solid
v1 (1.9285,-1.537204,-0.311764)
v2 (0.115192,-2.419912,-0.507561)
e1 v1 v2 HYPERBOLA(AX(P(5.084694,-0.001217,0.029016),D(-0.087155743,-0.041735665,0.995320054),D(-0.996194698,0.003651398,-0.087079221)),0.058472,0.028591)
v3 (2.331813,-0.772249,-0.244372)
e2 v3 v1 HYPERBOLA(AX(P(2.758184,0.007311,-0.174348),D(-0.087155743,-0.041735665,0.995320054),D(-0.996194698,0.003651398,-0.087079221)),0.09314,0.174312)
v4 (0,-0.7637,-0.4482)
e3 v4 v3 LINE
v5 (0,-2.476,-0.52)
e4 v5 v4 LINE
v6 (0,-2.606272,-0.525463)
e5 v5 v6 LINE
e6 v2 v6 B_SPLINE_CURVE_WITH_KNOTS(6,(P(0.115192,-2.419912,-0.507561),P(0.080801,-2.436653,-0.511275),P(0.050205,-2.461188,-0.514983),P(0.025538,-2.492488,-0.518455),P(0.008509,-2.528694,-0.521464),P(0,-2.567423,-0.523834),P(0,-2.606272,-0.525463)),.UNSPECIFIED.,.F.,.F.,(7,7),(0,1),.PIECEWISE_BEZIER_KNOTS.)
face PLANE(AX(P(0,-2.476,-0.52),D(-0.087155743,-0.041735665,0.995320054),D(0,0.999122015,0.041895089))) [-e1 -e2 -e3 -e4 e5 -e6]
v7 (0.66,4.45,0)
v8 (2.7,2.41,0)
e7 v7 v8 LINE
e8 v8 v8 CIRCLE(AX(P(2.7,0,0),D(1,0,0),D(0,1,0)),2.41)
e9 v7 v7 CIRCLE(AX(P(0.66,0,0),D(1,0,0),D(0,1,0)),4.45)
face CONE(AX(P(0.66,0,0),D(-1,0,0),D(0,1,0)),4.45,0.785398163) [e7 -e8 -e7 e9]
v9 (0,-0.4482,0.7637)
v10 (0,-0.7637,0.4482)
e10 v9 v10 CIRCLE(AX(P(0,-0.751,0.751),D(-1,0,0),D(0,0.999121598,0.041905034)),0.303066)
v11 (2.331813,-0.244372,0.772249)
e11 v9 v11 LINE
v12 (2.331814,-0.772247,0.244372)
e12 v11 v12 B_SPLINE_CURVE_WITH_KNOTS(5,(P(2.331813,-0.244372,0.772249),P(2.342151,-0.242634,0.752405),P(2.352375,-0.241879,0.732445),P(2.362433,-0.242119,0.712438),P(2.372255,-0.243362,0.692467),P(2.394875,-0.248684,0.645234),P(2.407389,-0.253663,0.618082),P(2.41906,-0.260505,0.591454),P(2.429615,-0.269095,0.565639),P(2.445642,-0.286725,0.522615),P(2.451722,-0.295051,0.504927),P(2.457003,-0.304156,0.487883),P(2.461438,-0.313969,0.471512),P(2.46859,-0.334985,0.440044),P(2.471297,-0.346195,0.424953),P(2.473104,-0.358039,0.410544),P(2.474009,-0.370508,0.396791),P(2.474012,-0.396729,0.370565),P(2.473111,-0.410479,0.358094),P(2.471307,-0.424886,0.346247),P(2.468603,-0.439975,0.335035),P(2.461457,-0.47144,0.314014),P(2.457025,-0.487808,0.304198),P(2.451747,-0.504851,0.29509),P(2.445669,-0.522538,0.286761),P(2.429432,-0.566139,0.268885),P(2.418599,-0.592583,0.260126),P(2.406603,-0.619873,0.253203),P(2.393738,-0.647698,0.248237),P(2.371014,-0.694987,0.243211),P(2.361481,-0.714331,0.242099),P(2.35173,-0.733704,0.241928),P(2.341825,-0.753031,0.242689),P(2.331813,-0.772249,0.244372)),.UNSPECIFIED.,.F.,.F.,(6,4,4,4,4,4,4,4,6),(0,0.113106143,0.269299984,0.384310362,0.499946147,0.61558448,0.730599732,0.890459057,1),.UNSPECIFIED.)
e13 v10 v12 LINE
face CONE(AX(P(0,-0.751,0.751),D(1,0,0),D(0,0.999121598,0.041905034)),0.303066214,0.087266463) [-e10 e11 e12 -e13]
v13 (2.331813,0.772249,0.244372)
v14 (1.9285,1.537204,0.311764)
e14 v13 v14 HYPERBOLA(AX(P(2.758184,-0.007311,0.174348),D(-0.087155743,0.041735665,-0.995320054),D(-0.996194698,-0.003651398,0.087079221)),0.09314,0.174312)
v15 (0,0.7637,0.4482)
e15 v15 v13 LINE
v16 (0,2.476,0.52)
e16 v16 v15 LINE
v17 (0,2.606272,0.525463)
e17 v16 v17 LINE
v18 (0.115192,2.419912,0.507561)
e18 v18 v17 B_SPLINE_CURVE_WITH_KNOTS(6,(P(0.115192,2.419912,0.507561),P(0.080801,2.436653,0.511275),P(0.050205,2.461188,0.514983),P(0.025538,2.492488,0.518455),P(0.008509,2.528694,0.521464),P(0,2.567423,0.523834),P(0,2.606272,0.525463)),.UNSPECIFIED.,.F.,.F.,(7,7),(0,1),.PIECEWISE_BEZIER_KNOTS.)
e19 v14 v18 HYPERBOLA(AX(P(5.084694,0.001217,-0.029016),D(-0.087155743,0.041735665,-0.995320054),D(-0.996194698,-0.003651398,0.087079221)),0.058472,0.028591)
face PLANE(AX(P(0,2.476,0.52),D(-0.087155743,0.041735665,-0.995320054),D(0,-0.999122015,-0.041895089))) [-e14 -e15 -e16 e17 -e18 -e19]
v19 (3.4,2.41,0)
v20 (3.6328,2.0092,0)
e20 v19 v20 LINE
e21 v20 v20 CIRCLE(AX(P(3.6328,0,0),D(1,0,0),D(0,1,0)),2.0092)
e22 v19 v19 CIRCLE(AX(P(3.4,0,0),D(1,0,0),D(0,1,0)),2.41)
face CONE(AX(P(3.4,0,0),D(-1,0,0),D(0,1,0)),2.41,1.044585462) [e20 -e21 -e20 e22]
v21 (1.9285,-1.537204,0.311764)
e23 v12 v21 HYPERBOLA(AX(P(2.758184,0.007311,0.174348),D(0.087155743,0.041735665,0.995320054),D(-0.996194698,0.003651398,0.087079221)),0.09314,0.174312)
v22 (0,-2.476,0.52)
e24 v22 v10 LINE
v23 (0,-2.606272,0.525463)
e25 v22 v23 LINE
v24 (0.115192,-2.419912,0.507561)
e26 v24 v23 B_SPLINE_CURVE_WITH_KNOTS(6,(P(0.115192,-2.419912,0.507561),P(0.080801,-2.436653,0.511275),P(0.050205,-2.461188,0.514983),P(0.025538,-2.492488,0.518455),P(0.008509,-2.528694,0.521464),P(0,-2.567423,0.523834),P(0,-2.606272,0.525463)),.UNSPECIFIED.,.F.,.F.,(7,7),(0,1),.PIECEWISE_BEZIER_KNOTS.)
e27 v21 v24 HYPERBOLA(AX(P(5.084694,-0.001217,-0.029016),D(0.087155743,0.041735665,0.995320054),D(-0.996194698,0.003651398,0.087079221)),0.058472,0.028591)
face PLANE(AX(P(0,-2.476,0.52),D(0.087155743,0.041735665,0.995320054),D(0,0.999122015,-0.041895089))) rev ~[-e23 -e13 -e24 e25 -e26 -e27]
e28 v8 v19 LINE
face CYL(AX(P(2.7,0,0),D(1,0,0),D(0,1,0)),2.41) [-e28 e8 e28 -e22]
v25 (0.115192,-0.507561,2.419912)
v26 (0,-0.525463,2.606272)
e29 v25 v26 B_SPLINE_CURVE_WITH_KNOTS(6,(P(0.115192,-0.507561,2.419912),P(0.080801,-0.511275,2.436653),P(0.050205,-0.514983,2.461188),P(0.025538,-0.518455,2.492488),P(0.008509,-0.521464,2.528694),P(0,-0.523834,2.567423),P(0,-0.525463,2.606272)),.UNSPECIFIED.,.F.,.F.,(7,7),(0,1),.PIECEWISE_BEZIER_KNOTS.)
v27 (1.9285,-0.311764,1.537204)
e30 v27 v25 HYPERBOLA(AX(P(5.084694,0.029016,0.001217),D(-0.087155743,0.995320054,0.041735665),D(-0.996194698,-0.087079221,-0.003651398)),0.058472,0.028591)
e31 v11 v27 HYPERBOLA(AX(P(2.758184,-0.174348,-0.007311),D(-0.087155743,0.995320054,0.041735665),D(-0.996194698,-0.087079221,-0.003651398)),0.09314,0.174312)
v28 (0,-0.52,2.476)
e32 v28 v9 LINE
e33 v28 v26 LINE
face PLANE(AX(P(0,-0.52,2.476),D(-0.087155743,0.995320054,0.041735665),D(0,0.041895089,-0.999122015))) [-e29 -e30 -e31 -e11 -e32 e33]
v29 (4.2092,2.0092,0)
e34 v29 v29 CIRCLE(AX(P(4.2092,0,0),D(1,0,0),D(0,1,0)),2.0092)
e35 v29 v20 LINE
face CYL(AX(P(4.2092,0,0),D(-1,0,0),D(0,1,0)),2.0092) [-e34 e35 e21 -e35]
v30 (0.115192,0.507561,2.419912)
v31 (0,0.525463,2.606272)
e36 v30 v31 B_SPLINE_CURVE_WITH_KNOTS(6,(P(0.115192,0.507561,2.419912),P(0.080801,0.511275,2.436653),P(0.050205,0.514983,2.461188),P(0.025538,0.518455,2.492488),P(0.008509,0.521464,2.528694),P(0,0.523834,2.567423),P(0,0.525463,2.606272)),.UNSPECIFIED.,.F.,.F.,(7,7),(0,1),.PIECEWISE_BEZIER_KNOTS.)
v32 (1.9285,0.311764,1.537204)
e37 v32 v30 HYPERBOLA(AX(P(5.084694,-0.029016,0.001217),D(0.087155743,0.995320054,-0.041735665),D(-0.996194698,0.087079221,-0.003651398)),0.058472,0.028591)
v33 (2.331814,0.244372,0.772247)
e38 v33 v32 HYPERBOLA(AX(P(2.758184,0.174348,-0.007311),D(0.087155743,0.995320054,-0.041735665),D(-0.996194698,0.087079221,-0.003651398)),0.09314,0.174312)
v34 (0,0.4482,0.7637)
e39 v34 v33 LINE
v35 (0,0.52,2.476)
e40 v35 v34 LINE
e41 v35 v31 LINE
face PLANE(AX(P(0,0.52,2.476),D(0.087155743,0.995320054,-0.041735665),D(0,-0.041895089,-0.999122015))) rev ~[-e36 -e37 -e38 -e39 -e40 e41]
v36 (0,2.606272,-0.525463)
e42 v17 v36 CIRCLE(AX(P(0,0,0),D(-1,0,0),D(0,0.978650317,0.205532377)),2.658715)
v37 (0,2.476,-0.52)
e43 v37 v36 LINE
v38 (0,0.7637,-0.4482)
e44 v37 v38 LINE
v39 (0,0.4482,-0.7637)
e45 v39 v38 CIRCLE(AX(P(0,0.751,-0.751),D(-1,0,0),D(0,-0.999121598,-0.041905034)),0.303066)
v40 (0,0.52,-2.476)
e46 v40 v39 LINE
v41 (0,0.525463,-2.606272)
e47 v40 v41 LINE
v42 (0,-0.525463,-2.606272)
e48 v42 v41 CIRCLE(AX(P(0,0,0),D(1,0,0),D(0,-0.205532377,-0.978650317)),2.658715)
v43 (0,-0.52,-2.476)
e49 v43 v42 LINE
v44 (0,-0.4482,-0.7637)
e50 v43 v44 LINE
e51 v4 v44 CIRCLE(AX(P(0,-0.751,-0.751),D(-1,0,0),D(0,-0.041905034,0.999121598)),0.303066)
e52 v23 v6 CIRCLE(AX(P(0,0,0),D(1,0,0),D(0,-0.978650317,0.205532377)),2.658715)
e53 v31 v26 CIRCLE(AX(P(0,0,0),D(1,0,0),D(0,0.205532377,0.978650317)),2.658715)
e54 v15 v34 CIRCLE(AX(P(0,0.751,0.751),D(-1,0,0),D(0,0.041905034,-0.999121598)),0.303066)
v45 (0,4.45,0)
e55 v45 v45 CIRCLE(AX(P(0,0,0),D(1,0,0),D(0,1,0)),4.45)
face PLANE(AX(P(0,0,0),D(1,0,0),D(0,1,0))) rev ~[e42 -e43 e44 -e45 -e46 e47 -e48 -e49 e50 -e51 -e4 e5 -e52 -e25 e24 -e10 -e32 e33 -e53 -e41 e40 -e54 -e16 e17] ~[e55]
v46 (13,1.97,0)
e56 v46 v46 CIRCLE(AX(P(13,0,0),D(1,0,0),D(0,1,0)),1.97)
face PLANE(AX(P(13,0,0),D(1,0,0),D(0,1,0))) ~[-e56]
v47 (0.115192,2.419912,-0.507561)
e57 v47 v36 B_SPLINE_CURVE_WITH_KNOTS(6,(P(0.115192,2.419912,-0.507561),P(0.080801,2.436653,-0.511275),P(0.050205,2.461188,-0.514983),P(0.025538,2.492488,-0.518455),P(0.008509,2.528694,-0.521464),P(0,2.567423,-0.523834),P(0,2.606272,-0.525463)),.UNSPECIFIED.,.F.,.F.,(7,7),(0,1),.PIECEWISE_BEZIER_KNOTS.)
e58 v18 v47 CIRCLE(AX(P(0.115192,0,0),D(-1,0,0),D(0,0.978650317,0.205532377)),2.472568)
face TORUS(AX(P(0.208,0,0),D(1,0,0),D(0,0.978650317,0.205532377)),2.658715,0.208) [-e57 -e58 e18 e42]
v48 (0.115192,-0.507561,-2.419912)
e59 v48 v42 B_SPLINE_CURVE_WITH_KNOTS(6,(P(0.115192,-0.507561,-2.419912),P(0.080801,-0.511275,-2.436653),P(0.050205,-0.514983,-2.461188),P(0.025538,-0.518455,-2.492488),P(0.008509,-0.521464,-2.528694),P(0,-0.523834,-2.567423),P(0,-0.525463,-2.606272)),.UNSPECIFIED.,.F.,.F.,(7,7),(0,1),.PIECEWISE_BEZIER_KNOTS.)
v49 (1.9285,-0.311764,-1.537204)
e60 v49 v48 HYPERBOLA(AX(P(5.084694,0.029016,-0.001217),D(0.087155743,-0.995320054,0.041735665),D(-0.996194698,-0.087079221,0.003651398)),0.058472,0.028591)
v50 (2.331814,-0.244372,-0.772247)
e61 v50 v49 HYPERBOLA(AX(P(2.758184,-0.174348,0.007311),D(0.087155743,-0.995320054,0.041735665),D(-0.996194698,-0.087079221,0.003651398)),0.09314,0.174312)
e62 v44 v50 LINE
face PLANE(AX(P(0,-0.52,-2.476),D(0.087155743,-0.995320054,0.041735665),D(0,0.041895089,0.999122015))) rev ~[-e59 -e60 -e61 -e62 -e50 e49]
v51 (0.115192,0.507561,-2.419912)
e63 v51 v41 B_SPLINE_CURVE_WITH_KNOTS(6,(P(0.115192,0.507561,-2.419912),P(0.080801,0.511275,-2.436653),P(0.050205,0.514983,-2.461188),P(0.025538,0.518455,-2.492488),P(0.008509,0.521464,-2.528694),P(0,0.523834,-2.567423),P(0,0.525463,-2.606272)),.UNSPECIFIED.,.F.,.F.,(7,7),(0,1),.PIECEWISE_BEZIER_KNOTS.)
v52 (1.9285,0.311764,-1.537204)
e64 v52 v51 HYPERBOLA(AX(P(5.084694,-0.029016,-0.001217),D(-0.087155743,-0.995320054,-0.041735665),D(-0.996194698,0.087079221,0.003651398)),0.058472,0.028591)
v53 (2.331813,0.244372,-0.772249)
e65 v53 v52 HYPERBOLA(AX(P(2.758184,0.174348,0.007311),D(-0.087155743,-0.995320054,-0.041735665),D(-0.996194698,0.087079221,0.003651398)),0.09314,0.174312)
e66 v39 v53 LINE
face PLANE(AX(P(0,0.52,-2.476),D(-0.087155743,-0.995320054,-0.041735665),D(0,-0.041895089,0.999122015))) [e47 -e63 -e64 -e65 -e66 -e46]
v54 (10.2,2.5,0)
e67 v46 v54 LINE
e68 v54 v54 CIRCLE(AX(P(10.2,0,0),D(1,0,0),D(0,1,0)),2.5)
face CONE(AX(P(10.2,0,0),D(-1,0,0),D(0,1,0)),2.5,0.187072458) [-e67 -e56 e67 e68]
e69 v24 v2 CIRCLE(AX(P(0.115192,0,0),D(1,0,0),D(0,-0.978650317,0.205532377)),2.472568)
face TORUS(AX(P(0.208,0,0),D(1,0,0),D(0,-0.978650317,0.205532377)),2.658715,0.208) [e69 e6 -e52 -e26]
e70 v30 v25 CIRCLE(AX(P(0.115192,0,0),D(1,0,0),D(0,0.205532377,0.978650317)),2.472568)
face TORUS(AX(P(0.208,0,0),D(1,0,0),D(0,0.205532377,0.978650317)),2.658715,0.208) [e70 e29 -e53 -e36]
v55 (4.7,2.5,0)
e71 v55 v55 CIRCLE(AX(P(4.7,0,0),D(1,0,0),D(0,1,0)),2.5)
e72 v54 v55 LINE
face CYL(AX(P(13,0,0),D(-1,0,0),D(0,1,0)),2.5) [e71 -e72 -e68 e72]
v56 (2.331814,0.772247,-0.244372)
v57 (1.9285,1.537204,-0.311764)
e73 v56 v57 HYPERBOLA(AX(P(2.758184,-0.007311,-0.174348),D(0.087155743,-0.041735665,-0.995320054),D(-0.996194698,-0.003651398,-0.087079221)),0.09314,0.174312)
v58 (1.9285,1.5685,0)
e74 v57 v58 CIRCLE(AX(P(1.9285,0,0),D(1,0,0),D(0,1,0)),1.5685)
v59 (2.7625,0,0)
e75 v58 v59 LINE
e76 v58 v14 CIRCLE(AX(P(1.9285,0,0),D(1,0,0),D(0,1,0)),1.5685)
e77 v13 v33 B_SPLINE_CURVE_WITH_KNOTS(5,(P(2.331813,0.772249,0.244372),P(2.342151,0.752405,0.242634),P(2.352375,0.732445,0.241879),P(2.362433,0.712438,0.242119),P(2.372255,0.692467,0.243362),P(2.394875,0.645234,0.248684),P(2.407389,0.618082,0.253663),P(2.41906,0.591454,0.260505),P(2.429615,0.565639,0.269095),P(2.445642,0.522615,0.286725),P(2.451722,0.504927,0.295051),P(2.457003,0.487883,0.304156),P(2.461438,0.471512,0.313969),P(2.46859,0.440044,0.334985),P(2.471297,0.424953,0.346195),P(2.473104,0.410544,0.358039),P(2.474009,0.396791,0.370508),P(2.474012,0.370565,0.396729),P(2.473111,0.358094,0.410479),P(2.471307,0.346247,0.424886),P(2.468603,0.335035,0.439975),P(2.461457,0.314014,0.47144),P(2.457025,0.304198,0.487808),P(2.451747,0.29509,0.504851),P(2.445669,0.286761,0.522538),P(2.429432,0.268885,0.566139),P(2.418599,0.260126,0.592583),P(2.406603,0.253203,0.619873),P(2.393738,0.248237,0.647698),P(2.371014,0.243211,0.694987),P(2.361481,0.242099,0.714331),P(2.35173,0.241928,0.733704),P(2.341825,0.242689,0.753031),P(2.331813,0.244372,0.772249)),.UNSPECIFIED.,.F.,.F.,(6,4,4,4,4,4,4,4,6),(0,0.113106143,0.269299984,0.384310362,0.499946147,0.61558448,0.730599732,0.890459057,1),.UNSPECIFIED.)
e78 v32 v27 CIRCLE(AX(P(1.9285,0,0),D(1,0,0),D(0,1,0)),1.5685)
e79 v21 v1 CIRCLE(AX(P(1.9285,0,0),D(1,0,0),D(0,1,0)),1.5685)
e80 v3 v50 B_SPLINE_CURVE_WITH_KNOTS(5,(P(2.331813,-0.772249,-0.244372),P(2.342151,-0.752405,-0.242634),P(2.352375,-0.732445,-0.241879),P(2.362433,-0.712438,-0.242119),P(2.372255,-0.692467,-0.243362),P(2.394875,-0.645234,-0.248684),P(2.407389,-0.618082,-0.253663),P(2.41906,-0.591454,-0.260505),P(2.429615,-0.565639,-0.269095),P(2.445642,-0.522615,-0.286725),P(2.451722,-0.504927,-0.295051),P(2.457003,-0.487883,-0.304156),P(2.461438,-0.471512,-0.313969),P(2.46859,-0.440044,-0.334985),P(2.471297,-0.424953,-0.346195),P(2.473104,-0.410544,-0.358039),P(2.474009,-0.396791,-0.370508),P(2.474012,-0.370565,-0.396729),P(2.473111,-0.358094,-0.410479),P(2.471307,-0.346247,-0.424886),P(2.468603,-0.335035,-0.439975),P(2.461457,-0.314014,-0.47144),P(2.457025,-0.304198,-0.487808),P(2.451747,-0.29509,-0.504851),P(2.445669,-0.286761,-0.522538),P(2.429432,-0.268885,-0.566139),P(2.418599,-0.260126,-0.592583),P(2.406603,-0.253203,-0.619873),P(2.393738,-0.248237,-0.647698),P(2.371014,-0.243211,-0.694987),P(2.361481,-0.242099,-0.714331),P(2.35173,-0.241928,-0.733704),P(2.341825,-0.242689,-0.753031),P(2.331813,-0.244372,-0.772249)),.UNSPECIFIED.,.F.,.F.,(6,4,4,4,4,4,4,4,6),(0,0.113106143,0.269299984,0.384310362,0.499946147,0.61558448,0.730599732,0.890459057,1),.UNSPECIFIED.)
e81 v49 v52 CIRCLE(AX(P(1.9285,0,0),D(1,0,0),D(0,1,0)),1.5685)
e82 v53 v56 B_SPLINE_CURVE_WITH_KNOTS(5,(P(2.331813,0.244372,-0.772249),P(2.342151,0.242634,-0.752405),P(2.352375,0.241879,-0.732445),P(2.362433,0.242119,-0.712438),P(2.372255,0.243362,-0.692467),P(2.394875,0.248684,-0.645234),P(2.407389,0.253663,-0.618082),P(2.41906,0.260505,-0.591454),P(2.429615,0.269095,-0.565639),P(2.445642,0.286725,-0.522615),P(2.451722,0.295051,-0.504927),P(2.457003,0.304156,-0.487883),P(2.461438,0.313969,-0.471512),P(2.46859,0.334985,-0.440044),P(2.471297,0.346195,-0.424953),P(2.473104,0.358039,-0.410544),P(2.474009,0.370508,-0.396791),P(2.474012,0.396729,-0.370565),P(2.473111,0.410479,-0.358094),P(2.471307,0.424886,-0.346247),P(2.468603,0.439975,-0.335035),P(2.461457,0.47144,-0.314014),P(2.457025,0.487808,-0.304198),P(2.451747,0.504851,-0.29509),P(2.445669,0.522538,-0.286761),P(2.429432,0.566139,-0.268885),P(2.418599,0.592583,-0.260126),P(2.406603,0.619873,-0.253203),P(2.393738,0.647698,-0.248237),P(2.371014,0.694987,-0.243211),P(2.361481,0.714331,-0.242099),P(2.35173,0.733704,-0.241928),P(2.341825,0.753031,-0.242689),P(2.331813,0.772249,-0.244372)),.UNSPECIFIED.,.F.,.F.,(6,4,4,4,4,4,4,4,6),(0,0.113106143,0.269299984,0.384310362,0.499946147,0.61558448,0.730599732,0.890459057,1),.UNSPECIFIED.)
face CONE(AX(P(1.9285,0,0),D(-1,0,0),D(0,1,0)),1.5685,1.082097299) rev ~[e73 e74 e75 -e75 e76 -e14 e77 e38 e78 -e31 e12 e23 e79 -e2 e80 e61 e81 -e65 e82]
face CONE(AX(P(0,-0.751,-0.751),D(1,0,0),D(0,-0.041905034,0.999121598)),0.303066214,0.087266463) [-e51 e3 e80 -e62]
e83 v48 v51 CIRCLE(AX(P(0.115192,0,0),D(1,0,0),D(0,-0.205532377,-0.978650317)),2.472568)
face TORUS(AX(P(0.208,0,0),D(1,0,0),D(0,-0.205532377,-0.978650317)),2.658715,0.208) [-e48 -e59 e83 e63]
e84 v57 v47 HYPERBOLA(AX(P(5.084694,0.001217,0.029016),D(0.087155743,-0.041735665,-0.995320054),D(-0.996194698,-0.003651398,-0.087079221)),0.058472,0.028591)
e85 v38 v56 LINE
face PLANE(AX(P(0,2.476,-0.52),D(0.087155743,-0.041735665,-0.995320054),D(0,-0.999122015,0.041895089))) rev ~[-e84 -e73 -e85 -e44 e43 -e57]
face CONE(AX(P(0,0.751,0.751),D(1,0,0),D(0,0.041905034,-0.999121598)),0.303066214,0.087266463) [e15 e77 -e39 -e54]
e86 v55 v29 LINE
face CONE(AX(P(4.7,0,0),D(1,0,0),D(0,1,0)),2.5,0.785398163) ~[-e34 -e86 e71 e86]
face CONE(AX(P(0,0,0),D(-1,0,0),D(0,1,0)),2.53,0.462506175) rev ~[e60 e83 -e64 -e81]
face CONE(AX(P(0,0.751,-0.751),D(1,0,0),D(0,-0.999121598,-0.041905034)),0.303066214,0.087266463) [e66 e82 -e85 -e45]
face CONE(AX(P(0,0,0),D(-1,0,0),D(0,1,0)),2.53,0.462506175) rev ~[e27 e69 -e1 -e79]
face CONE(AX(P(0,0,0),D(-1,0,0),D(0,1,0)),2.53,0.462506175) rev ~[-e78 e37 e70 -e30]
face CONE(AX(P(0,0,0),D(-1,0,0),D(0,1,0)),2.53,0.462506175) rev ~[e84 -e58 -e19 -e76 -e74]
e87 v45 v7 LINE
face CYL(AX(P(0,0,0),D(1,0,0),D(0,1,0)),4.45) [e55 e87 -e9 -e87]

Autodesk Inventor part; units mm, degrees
ref_plane "YZ Plane" through (0, 0, 0) normal (1, 0, 0) x (0, 1, 0)
ref_plane "XZ Plane" through (0, 0, 0) normal (0, 1, 0) x (-1, 0, 0)
sketch "Sketch1" plane through (0, 0, 0) normal (0, 0, 1) x (1, 0, 0)
  line L0 (2.7625, 0) -> (13, 0)
  line L1 (13, 0) -> (13, 2.5)
  line L2 (13, 2.5) -> (4.7, 2.5)
  line L3 (4.7, 2.5) -> (4.2092, 2.0092)
  line L4 (4.2092, 2.0092) -> (3.6328, 2.0092)
  line L5 (0, 4.45) -> (0, 2.53)
  line L6 (0, 2.53) -> (1.9285, 1.5685)
  line L7 (1.9285, 1.5685) -> (2.7625, 0)
  line L8 (-2.6, 0) -> (15.6, 0) projected
  line L9 (0, -0.89) -> (0, 5.34) projected
  line L10 (0, 4.45) -> (0.66, 4.45)
  line L11 (0.66, 4.45) -> (2.7, 2.41)
  line L12 (2.7, 2.41) -> (3.4, 2.41)
  line L13 (3.4, 2.41) -> (3.6328, 2.0092)
  line L14 (3.4, 2.41) -> (4.61, 2.41) construction
  line L15 (4.7, 2.5) -> (2.61, 2.5) construction
  dimension "d0" = 8.3
  dimension "d1" = 5
  dimension "d2" = 4.0185
  dimension "d3" = 5.06
  dimension "d4" = 26.5
  dimension "d5" = 62
  dimension "d6" = 2.7625
  dimension "d11" = 8.9
  dimension "d12" = 4.82
  dimension "d13" = 45
  dimension "d14" = 59.85
  dimension "d15" = 2.7
  dimension "d17" = 0.7
  dimension "d19" = 13
  dimension "d27" = 45
revolve "Body" add sketch "Sketch1" angle 360 about axis through (2.7625, 0, 0) along (1, 0, 0) contours L7 L6 L5 L10 L11 L12 L13 L4 L3 L2 L1 L0
sketch "Sketch2" plane through (0, 0, 0) normal (-1, 0, 0) x (0, 0, 1)
  line L0 (0, 2.53) -> (0, 0) construction
  line L1 (0, 0) -> (2.53, 0) construction
  arc A0 (0.759, 0) -> (0, 0.759) centre (0, 0) ccw construction
  arc A1 (0.8855, 0) -> (0, 0.8855) centre (0, 0) ccw construction
  arc A2 (2.476, 0.52) -> (0.52, 2.476) centre (0, 0) ccw
  line L2 (0, 0) -> (1.789, 1.789) construction
  line L3 (0.52, 2.476) -> (0.4482, 0.7637)
  line L4 (2.476, 0.52) -> (0.7637, 0.4482)
  arc A3 (0.52, 2.476) -> (0, 2.53) centre (0, 0) ccw
  arc A4 (2.53, 0) -> (2.476, 0.52) centre (0, 0) ccw
  line L5 (0, -6.23) -> (0, 6.23) projected
  line L6 (-6.23, 0) -> (6.23, 0) projected
  arc A5 (0.52, -2.476) -> (2.476, -0.52) centre (0, 0) ccw
  line L7 (0.52, -2.476) -> (0.4482, -0.7637)
  line L8 (2.476, -0.52) -> (0.7637, -0.4482)
  arc A6 (0, -2.53) -> (0.52, -2.476) centre (0, 0) ccw
  arc A7 (2.476, -0.52) -> (2.53, 0) centre (0, 0) ccw
  arc A8 (-0.52, 2.476) -> (-2.476, 0.52) centre (0, 0) ccw
  line L9 (-0.52, 2.476) -> (-0.4482, 0.7637)
  line L10 (-2.476, 0.52) -> (-0.7637, 0.4482)
  arc A9 (0, 2.53) -> (-0.52, 2.476) centre (0, 0) ccw
  arc A10 (-2.476, 0.52) -> (-2.53, 0) centre (0, 0) ccw
  arc A11 (-0.52, -2.476) -> (0, -2.53) centre (0, 0) ccw
  arc A12 (-2.476, -0.52) -> (-0.52, -2.476) centre (0, 0) ccw
  arc A13 (-2.53, 0) -> (-2.476, -0.52) centre (0, 0) ccw
  line L11 (-2.476, -0.52) -> (-0.7637, -0.4482)
  line L12 (-0.52, -2.476) -> (-0.4482, -0.7637)
  arc A14 (0.4482, 0.7637) -> (0.7637, 0.4482) centre (0.751, 0.751) ccw
  arc A15 (0.7637, -0.4482) -> (0.4482, -0.7637) centre (0.751, -0.751) ccw
  arc A16 (-0.7637, 0.4482) -> (-0.4482, 0.7637) centre (-0.751, 0.751) ccw
  arc A17 (-0.4482, -0.7637) -> (-0.7637, -0.4482) centre (-0.751, -0.751) ccw
  point P0 (1.789, -1.789)
  point P1 (-1.789, 1.789)
  point P2 (-1.789, -1.789)
  dimension "d20" = 1.518
  dimension "d21" = 1.771
  dimension "d22" = 5.06
  dimension "d23" = 45
  dimension "d24" = 0.52
extrude "Slot" add sketch "Sketch2" against normal up to next draft 5 contours L4 A14 L3 A2 | A5 L7 A15 L8 | L9 A16 L10 A8 | A12 L11 A17 L12
fillet "Fillet1" radius 0.208 4 edges at (0, 2.53, 0) (0, 0, -2.53) (0, -2.53, 0) (0, 0, 2.53)
thread "Thread" size "M5x0.8" class "6g" standard "ISO Metric profile" length 8.3
chamfer "Chamfer1" distance 0.53 distance2 2.8 1 edges at (13, -2.5, 0) measured on face at (13, -0.5525, -0.0341)
ref_plane "Work Plane2" through (3.3, 0, 0) normal (0, 0, 1) x (1, 0, 0)
equation "\"d20\" = 0.3 * SDM"
equation "\"d21\" = 0.35 * SDM"
equation "\"d22\" = SDM"
equation "\"d24\" = 0.5 * SBR"
equation "\"d0\" = GEL"
equation "\"d1\" = NND"
equation "\"d2\" = GD1"
equation "\"d3\" = SDM"
equation "\"d6\" = 0.85 * INTI"
equation "\"d11\" = KOD"
equation "\"d12\" = SD2"
equation "\"d13\" = 0.5 * SEWI"
equation "\"d14\" = 1.33 * ANGL"
equation "\"d15\" = KOH"
equation "\"d17\" = SD"
equation "\"d19\" = NLG"
equation "\"d27\" = ANGL"
equation "\"d26\" = 0.2 * SBR"
equation "\"d8\" = GEL"
equation "\"d28\" = -0.5 * GD2 + 0.5 * NND"
equation "\"d29\" = SPTZ"
equation "\"NLG\" = 13"
equation "\"GEL\" = 8.3"
equation "\"GD2\" = 3.94"
equation "\"KOD\" = 8.9"
equation "\"KOH\" = 2.7"
equation "\"SBR\" = 1.04"
equation "\"INTI\" = 3.25"
equation "\"SDM\" = 5.06"
equation "\"NND\" = 5"
equation "\"GD1\" = THREADDIA - 1.2269 * PTC"
equation "\"SEWI\" = 90deg"
equation "\"d7\" = SDM"
equation "\"ANGL\" = 45deg"
equation "\"SD\" = 0.7"
equation "\"SD2\" = 4.82"
equation "\"SPTZ\" = 2.8"
equation "\"TOA\" = 30deg"
equation "\"THREADDIA\" = 5"
equation "\"PTC\" = 0.8"
equation "\"GUL\" = 0.61345 * PTC"
equation "\"GAL\" = 0.61345 * PTC"
properties part number "ANSI B18.6.5M - M5x0.8 x 13 - D - I" material "Steel, Mild"
